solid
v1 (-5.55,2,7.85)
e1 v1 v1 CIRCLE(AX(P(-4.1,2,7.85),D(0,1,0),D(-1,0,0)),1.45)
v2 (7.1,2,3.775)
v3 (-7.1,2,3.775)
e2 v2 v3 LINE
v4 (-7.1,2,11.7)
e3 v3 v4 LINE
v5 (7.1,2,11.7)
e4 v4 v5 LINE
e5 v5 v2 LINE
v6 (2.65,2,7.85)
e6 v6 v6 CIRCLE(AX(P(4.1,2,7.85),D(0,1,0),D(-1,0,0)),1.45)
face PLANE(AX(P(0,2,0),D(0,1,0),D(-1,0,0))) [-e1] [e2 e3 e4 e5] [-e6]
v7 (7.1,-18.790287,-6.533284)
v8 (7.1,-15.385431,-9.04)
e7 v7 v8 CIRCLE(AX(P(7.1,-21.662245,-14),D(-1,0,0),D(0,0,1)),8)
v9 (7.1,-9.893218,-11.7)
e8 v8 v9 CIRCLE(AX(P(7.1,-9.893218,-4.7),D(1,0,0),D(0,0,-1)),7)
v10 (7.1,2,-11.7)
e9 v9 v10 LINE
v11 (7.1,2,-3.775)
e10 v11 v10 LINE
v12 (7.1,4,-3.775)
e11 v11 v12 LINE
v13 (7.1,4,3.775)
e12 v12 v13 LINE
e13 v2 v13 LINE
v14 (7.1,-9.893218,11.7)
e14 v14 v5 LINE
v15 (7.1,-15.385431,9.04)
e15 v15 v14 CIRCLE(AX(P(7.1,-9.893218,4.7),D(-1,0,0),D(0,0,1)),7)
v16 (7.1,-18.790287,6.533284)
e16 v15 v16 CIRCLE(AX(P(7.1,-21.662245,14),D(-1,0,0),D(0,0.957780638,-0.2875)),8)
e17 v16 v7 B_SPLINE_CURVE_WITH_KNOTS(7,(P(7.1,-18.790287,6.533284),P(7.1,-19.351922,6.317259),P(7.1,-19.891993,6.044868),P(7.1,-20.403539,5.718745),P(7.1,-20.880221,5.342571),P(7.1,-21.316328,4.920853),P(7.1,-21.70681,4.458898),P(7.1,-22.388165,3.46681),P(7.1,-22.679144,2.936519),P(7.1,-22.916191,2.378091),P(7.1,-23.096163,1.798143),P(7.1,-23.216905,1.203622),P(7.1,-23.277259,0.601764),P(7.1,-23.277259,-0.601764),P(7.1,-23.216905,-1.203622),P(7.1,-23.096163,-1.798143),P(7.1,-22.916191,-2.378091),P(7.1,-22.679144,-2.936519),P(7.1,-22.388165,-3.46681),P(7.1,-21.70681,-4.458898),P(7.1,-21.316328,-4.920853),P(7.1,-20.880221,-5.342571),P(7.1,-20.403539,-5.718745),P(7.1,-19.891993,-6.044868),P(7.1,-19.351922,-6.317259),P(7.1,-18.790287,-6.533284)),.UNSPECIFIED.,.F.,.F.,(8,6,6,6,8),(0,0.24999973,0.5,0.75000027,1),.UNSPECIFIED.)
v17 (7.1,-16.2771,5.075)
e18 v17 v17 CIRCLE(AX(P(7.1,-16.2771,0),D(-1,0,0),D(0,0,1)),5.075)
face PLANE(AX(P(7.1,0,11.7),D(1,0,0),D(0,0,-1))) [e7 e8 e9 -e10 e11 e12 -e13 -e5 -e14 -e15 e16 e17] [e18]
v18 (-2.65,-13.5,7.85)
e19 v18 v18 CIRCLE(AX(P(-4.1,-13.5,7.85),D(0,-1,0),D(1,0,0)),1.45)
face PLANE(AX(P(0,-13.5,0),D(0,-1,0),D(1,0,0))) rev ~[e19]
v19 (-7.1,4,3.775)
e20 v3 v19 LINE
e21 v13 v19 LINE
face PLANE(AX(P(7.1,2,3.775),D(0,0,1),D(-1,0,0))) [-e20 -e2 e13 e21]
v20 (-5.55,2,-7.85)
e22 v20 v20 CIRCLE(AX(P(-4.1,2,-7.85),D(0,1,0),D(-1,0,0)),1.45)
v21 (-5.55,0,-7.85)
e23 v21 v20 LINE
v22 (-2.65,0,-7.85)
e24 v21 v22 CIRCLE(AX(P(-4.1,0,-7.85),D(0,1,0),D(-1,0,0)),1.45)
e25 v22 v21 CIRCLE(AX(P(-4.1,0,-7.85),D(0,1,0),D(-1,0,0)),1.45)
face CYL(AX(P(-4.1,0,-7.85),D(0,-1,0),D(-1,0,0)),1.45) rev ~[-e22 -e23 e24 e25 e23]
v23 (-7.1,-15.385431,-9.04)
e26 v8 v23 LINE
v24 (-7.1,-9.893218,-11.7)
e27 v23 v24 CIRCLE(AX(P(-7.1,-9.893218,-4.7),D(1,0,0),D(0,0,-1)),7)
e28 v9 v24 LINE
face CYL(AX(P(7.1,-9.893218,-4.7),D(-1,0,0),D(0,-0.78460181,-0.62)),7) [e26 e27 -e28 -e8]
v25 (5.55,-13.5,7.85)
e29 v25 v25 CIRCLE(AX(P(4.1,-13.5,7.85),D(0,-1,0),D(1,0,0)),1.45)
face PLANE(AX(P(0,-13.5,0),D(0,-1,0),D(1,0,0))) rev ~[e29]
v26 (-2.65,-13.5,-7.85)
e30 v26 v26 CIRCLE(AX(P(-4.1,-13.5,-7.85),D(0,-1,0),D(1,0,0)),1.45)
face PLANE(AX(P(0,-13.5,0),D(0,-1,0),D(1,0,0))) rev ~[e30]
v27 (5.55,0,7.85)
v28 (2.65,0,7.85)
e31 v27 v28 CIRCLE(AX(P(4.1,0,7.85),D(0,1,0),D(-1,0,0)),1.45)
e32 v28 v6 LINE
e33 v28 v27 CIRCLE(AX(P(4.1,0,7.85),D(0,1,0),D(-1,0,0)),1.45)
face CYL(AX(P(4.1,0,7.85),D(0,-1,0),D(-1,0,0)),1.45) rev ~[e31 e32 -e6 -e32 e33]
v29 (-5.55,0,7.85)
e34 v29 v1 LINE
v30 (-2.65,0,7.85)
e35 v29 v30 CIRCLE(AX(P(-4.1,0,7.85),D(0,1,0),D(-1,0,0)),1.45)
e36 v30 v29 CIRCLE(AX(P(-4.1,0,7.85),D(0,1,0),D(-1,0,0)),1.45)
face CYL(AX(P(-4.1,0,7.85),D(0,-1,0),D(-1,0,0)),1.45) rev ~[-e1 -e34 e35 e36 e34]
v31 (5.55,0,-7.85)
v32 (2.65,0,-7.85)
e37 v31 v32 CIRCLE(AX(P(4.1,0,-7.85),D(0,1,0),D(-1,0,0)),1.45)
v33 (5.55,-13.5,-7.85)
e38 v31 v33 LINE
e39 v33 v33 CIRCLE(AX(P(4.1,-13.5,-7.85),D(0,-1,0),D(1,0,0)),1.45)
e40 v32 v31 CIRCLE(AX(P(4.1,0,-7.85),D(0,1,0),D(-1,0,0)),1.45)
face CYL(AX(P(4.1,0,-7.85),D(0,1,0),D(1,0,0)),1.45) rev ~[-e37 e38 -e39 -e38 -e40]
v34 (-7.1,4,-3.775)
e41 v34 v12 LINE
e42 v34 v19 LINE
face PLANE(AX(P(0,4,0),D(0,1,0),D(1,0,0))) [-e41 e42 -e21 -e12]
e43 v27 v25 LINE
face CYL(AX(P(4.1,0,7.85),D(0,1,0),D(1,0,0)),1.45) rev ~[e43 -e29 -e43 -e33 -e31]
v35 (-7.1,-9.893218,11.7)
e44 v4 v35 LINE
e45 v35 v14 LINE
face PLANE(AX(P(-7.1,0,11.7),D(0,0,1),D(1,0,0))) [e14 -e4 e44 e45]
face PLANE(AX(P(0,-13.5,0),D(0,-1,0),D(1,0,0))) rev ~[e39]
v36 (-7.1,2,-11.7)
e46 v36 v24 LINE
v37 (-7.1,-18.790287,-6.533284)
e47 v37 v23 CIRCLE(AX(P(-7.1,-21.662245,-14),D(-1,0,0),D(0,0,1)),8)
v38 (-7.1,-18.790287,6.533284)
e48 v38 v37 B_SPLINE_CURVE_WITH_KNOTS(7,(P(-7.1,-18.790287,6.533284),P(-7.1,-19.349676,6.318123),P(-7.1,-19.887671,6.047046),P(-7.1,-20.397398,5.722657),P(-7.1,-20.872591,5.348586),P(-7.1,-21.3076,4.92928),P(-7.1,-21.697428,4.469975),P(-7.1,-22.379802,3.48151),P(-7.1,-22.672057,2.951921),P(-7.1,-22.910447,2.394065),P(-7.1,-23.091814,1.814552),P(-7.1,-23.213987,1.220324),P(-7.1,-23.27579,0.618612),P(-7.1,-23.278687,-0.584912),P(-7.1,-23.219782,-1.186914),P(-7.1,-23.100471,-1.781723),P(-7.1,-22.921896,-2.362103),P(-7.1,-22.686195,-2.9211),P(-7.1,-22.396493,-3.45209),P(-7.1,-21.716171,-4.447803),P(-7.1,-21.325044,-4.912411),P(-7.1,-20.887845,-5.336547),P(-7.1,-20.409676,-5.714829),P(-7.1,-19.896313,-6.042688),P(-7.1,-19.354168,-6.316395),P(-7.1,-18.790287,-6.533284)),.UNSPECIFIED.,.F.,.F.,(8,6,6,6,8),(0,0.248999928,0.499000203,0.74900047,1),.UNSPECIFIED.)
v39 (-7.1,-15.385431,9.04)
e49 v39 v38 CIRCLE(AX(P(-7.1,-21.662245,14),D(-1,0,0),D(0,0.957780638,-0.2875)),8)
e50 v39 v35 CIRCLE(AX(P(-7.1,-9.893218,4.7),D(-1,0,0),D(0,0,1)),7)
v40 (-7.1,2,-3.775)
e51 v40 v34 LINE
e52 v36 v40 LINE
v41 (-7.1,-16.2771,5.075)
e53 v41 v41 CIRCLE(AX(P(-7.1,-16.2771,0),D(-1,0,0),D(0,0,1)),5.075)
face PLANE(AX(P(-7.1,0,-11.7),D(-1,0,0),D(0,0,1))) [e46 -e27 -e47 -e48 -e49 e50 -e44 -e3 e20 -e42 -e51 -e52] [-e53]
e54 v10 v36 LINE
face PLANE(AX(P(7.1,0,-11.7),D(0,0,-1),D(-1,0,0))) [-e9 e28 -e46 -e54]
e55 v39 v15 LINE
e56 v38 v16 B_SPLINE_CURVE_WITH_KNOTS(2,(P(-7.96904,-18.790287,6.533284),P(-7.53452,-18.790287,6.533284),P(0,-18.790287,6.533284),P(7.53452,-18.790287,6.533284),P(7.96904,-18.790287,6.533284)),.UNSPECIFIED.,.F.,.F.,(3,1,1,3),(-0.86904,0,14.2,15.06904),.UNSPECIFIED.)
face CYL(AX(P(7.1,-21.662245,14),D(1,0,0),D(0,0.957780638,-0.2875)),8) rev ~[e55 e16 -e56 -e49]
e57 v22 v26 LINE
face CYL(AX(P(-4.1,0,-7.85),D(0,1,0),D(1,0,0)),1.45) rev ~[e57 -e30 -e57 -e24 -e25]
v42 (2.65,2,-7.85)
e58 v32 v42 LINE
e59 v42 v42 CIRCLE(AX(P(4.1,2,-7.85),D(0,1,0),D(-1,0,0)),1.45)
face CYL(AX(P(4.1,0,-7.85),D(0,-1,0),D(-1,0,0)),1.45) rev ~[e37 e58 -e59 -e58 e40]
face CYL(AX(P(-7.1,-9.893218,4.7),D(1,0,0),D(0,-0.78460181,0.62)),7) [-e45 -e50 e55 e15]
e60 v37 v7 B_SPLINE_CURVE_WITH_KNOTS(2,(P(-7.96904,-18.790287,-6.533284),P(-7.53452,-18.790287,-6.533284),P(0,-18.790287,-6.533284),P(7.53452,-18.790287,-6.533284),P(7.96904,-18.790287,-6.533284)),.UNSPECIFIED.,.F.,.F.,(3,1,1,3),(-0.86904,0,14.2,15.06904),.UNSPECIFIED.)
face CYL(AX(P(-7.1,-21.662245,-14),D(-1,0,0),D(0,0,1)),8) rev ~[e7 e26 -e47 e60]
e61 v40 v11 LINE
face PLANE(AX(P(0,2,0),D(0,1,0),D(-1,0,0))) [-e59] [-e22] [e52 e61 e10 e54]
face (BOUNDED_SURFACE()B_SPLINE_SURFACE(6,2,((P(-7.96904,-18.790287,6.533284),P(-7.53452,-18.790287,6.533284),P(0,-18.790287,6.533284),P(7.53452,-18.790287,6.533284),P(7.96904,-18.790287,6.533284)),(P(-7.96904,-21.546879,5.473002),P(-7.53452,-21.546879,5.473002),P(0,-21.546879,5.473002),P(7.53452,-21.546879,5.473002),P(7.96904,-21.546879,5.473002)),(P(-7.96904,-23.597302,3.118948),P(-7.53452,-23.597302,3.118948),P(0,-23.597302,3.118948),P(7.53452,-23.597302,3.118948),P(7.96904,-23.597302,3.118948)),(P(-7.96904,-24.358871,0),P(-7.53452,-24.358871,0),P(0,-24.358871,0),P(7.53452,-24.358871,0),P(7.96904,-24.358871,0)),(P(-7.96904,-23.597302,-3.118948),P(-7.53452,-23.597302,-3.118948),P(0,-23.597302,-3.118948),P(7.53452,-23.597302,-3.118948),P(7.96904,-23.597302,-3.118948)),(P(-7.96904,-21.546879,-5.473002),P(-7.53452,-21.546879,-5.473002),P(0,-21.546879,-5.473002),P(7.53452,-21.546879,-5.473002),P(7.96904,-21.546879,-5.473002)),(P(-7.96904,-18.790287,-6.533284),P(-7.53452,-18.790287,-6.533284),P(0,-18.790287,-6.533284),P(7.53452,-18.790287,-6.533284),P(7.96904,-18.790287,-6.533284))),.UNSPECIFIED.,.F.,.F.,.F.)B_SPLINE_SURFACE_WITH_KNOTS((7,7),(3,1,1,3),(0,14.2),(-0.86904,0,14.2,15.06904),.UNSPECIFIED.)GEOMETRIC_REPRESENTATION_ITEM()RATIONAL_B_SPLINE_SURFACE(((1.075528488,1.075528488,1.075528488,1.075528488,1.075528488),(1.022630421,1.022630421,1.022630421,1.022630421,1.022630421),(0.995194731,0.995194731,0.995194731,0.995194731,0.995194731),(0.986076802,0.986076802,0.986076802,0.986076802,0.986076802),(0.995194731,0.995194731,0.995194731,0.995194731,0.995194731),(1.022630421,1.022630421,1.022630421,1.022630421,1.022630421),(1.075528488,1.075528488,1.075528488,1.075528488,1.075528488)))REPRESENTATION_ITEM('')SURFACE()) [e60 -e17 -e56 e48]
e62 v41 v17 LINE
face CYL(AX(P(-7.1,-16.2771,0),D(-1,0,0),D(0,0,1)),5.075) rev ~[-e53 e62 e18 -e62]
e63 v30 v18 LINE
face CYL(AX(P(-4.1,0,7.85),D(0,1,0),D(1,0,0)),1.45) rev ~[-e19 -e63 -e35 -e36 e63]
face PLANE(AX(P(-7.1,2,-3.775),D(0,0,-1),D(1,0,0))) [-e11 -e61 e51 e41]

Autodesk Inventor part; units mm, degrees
ref_plane "YZ Plane" through (0, 0, 0) normal (1, 0, 0) x (0, 1, 0)
ref_plane "XZ Plane" through (0, 0, 0) normal (0, 1, 0) x (-1, 0, 0)
ref_plane "XY Plane" through (0, 0, 0) normal (0, 0, 1) x (1, 0, 0)
sketch "Boceto1" plane through (0, 0, 0) normal (0, 1, 0) x (-1, 0, 0)
  line L0 (7.1, 11.7) -> (-7.1, 11.7)
  line L1 (-7.1, 11.7) -> (-7.1, -11.7)
  line L2 (-7.1, -11.7) -> (7.1, -11.7)
  line L3 (7.1, -11.7) -> (7.1, 11.7)
  line L4 (7.1, 11.7) -> (-7.1, -11.7) construction
  line L5 (-7.1, 11.7) -> (7.1, -11.7) construction
  circle A0 centre (4.1, 7.85) radius 1.45
  circle A1 centre (-4.1, 7.85) radius 1.45
  circle A2 centre (4.1, -7.85) radius 1.45
  circle A3 centre (-4.1, -7.85) radius 1.45
  point P0 (0, 0)
  dimension "d0" = 23.4
  dimension "d1" = 14.2
  dimension "d2" = 2.9
  dimension "d3" = 8.2
  dimension "d4" = 4.1
  dimension "d5" = 7.85
  dimension "d6" = 7.85
extrude "Extrusión1" add sketch "Boceto1" along normal blind 2
sketch "Boceto2" plane through (0, 2, 0) normal (0, 1, 0) x (1, 0, 0)
  line L0 (-7.1, 11.7) -> (-7.1, -11.7) projected
  line L1 (7.1, -3.775) -> (-7.1, -3.775)
  line L2 (-7.1, -3.775) -> (-7.1, 3.775)
  line L3 (-7.1, 3.775) -> (7.1, 3.775)
  line L4 (7.1, 3.775) -> (7.1, -3.775)
  line L5 (7.1, -3.775) -> (-7.1, 3.775) construction
  line L6 (-7.1, -3.775) -> (7.1, 3.775) construction
  point P0 (0, 0)
  point P1 (-7.1, 9.7)
  point P2 (-7.1, -9.7)
  point P3 (-7.1, -3.775)
  dimension "d10" = 7.55
extrude "Extrusión2" add sketch "Boceto2" along normal blind 2
sketch "Boceto3" plane through (0, 0, 0) normal (0, -1, 0) x (1, 0, 0)
  line L0 (-7.1, 11.7) -> (7.1, 11.7) projected
  line L1 (-7.1, -11.7) -> (-7.1, 11.7) projected
  line L2 (7.1, -11.7) -> (-7.1, -11.7) projected
  line L3 (7.1, 11.7) -> (7.1, -11.7) projected
  circle A0 centre (-4.1, 7.85) radius 1.45 projected
  circle A1 centre (4.1, 7.85) radius 1.45 projected
  circle A2 centre (-4.1, -7.85) radius 1.45 projected
  circle A3 centre (4.1, -7.85) radius 1.45 projected
  point P0 (0, 0)
extrude "Extrusión3" add sketch "Boceto3" along normal blind 14
sketch "Boceto5" plane through (0, -14, 0) normal (0, -1, 0) x (1, 0, 0)
  line L0 (7.1, -11.7) -> (7.1, 11.7) projected
  line L1 (-7.1, -6) -> (7.1, -6)
  line L2 (7.1, -6) -> (7.1, 6)
  line L3 (7.1, 6) -> (-7.1, 6)
  line L4 (-7.1, 6) -> (-7.1, -6)
  line L5 (-7.1, -6) -> (7.1, 6) construction
  line L6 (7.1, -6) -> (-7.1, 6) construction
  point P0 (0, 0)
  point P1 (7.1, -9.7)
  point P2 (7.1, 9.7)
  point P3 (7.1, -6)
  dimension "d16" = 12
extrude "Extrusión4" add sketch "Boceto5" along normal blind 14
sketch "Boceto7" plane through (0, -14, 0) normal (0, -1, 0) x (1, 0, 0)
  circle A0 centre (-4.1, 7.85) radius 1.45 projected
  circle A1 centre (4.1, 7.85) radius 1.45 projected
  circle A2 centre (4.1, -7.85) radius 1.45 projected
  circle A3 centre (-4.1, -7.85) radius 1.45 projected
  point P0 (0, 0)
extrude "Extrusión6" add sketch "Boceto7" against normal blind 0.5
fillet "Empalme3" radius 8 2 edges at (0, -14, 6) (0, -14, -6)
fillet "Empalme4" radius 7 2 edges at (0, -28, -6) (0, -28, 6)
fillet "Empalme5" radius 7 2 edges at (0, -14, -11.7) (0, -14, 11.7)
sketch "Boceto8" plane through (-7.1, 2, 3.775) normal (-1, 0, 0) x (0, 0, 1)
  arc A0 (-10.3083, -20.7902) -> (2.7583, -20.7902) centre (-3.775, -18.2771) ccw projected
  circle A1 centre (-3.775, -18.2771) radius 5.075
  point P0 (-3.775, -2)
  dimension "d28" = 10.15
extrude "Extrusión7" cut sketch "Boceto8" against normal through all
properties part number "MiddleJoint"
